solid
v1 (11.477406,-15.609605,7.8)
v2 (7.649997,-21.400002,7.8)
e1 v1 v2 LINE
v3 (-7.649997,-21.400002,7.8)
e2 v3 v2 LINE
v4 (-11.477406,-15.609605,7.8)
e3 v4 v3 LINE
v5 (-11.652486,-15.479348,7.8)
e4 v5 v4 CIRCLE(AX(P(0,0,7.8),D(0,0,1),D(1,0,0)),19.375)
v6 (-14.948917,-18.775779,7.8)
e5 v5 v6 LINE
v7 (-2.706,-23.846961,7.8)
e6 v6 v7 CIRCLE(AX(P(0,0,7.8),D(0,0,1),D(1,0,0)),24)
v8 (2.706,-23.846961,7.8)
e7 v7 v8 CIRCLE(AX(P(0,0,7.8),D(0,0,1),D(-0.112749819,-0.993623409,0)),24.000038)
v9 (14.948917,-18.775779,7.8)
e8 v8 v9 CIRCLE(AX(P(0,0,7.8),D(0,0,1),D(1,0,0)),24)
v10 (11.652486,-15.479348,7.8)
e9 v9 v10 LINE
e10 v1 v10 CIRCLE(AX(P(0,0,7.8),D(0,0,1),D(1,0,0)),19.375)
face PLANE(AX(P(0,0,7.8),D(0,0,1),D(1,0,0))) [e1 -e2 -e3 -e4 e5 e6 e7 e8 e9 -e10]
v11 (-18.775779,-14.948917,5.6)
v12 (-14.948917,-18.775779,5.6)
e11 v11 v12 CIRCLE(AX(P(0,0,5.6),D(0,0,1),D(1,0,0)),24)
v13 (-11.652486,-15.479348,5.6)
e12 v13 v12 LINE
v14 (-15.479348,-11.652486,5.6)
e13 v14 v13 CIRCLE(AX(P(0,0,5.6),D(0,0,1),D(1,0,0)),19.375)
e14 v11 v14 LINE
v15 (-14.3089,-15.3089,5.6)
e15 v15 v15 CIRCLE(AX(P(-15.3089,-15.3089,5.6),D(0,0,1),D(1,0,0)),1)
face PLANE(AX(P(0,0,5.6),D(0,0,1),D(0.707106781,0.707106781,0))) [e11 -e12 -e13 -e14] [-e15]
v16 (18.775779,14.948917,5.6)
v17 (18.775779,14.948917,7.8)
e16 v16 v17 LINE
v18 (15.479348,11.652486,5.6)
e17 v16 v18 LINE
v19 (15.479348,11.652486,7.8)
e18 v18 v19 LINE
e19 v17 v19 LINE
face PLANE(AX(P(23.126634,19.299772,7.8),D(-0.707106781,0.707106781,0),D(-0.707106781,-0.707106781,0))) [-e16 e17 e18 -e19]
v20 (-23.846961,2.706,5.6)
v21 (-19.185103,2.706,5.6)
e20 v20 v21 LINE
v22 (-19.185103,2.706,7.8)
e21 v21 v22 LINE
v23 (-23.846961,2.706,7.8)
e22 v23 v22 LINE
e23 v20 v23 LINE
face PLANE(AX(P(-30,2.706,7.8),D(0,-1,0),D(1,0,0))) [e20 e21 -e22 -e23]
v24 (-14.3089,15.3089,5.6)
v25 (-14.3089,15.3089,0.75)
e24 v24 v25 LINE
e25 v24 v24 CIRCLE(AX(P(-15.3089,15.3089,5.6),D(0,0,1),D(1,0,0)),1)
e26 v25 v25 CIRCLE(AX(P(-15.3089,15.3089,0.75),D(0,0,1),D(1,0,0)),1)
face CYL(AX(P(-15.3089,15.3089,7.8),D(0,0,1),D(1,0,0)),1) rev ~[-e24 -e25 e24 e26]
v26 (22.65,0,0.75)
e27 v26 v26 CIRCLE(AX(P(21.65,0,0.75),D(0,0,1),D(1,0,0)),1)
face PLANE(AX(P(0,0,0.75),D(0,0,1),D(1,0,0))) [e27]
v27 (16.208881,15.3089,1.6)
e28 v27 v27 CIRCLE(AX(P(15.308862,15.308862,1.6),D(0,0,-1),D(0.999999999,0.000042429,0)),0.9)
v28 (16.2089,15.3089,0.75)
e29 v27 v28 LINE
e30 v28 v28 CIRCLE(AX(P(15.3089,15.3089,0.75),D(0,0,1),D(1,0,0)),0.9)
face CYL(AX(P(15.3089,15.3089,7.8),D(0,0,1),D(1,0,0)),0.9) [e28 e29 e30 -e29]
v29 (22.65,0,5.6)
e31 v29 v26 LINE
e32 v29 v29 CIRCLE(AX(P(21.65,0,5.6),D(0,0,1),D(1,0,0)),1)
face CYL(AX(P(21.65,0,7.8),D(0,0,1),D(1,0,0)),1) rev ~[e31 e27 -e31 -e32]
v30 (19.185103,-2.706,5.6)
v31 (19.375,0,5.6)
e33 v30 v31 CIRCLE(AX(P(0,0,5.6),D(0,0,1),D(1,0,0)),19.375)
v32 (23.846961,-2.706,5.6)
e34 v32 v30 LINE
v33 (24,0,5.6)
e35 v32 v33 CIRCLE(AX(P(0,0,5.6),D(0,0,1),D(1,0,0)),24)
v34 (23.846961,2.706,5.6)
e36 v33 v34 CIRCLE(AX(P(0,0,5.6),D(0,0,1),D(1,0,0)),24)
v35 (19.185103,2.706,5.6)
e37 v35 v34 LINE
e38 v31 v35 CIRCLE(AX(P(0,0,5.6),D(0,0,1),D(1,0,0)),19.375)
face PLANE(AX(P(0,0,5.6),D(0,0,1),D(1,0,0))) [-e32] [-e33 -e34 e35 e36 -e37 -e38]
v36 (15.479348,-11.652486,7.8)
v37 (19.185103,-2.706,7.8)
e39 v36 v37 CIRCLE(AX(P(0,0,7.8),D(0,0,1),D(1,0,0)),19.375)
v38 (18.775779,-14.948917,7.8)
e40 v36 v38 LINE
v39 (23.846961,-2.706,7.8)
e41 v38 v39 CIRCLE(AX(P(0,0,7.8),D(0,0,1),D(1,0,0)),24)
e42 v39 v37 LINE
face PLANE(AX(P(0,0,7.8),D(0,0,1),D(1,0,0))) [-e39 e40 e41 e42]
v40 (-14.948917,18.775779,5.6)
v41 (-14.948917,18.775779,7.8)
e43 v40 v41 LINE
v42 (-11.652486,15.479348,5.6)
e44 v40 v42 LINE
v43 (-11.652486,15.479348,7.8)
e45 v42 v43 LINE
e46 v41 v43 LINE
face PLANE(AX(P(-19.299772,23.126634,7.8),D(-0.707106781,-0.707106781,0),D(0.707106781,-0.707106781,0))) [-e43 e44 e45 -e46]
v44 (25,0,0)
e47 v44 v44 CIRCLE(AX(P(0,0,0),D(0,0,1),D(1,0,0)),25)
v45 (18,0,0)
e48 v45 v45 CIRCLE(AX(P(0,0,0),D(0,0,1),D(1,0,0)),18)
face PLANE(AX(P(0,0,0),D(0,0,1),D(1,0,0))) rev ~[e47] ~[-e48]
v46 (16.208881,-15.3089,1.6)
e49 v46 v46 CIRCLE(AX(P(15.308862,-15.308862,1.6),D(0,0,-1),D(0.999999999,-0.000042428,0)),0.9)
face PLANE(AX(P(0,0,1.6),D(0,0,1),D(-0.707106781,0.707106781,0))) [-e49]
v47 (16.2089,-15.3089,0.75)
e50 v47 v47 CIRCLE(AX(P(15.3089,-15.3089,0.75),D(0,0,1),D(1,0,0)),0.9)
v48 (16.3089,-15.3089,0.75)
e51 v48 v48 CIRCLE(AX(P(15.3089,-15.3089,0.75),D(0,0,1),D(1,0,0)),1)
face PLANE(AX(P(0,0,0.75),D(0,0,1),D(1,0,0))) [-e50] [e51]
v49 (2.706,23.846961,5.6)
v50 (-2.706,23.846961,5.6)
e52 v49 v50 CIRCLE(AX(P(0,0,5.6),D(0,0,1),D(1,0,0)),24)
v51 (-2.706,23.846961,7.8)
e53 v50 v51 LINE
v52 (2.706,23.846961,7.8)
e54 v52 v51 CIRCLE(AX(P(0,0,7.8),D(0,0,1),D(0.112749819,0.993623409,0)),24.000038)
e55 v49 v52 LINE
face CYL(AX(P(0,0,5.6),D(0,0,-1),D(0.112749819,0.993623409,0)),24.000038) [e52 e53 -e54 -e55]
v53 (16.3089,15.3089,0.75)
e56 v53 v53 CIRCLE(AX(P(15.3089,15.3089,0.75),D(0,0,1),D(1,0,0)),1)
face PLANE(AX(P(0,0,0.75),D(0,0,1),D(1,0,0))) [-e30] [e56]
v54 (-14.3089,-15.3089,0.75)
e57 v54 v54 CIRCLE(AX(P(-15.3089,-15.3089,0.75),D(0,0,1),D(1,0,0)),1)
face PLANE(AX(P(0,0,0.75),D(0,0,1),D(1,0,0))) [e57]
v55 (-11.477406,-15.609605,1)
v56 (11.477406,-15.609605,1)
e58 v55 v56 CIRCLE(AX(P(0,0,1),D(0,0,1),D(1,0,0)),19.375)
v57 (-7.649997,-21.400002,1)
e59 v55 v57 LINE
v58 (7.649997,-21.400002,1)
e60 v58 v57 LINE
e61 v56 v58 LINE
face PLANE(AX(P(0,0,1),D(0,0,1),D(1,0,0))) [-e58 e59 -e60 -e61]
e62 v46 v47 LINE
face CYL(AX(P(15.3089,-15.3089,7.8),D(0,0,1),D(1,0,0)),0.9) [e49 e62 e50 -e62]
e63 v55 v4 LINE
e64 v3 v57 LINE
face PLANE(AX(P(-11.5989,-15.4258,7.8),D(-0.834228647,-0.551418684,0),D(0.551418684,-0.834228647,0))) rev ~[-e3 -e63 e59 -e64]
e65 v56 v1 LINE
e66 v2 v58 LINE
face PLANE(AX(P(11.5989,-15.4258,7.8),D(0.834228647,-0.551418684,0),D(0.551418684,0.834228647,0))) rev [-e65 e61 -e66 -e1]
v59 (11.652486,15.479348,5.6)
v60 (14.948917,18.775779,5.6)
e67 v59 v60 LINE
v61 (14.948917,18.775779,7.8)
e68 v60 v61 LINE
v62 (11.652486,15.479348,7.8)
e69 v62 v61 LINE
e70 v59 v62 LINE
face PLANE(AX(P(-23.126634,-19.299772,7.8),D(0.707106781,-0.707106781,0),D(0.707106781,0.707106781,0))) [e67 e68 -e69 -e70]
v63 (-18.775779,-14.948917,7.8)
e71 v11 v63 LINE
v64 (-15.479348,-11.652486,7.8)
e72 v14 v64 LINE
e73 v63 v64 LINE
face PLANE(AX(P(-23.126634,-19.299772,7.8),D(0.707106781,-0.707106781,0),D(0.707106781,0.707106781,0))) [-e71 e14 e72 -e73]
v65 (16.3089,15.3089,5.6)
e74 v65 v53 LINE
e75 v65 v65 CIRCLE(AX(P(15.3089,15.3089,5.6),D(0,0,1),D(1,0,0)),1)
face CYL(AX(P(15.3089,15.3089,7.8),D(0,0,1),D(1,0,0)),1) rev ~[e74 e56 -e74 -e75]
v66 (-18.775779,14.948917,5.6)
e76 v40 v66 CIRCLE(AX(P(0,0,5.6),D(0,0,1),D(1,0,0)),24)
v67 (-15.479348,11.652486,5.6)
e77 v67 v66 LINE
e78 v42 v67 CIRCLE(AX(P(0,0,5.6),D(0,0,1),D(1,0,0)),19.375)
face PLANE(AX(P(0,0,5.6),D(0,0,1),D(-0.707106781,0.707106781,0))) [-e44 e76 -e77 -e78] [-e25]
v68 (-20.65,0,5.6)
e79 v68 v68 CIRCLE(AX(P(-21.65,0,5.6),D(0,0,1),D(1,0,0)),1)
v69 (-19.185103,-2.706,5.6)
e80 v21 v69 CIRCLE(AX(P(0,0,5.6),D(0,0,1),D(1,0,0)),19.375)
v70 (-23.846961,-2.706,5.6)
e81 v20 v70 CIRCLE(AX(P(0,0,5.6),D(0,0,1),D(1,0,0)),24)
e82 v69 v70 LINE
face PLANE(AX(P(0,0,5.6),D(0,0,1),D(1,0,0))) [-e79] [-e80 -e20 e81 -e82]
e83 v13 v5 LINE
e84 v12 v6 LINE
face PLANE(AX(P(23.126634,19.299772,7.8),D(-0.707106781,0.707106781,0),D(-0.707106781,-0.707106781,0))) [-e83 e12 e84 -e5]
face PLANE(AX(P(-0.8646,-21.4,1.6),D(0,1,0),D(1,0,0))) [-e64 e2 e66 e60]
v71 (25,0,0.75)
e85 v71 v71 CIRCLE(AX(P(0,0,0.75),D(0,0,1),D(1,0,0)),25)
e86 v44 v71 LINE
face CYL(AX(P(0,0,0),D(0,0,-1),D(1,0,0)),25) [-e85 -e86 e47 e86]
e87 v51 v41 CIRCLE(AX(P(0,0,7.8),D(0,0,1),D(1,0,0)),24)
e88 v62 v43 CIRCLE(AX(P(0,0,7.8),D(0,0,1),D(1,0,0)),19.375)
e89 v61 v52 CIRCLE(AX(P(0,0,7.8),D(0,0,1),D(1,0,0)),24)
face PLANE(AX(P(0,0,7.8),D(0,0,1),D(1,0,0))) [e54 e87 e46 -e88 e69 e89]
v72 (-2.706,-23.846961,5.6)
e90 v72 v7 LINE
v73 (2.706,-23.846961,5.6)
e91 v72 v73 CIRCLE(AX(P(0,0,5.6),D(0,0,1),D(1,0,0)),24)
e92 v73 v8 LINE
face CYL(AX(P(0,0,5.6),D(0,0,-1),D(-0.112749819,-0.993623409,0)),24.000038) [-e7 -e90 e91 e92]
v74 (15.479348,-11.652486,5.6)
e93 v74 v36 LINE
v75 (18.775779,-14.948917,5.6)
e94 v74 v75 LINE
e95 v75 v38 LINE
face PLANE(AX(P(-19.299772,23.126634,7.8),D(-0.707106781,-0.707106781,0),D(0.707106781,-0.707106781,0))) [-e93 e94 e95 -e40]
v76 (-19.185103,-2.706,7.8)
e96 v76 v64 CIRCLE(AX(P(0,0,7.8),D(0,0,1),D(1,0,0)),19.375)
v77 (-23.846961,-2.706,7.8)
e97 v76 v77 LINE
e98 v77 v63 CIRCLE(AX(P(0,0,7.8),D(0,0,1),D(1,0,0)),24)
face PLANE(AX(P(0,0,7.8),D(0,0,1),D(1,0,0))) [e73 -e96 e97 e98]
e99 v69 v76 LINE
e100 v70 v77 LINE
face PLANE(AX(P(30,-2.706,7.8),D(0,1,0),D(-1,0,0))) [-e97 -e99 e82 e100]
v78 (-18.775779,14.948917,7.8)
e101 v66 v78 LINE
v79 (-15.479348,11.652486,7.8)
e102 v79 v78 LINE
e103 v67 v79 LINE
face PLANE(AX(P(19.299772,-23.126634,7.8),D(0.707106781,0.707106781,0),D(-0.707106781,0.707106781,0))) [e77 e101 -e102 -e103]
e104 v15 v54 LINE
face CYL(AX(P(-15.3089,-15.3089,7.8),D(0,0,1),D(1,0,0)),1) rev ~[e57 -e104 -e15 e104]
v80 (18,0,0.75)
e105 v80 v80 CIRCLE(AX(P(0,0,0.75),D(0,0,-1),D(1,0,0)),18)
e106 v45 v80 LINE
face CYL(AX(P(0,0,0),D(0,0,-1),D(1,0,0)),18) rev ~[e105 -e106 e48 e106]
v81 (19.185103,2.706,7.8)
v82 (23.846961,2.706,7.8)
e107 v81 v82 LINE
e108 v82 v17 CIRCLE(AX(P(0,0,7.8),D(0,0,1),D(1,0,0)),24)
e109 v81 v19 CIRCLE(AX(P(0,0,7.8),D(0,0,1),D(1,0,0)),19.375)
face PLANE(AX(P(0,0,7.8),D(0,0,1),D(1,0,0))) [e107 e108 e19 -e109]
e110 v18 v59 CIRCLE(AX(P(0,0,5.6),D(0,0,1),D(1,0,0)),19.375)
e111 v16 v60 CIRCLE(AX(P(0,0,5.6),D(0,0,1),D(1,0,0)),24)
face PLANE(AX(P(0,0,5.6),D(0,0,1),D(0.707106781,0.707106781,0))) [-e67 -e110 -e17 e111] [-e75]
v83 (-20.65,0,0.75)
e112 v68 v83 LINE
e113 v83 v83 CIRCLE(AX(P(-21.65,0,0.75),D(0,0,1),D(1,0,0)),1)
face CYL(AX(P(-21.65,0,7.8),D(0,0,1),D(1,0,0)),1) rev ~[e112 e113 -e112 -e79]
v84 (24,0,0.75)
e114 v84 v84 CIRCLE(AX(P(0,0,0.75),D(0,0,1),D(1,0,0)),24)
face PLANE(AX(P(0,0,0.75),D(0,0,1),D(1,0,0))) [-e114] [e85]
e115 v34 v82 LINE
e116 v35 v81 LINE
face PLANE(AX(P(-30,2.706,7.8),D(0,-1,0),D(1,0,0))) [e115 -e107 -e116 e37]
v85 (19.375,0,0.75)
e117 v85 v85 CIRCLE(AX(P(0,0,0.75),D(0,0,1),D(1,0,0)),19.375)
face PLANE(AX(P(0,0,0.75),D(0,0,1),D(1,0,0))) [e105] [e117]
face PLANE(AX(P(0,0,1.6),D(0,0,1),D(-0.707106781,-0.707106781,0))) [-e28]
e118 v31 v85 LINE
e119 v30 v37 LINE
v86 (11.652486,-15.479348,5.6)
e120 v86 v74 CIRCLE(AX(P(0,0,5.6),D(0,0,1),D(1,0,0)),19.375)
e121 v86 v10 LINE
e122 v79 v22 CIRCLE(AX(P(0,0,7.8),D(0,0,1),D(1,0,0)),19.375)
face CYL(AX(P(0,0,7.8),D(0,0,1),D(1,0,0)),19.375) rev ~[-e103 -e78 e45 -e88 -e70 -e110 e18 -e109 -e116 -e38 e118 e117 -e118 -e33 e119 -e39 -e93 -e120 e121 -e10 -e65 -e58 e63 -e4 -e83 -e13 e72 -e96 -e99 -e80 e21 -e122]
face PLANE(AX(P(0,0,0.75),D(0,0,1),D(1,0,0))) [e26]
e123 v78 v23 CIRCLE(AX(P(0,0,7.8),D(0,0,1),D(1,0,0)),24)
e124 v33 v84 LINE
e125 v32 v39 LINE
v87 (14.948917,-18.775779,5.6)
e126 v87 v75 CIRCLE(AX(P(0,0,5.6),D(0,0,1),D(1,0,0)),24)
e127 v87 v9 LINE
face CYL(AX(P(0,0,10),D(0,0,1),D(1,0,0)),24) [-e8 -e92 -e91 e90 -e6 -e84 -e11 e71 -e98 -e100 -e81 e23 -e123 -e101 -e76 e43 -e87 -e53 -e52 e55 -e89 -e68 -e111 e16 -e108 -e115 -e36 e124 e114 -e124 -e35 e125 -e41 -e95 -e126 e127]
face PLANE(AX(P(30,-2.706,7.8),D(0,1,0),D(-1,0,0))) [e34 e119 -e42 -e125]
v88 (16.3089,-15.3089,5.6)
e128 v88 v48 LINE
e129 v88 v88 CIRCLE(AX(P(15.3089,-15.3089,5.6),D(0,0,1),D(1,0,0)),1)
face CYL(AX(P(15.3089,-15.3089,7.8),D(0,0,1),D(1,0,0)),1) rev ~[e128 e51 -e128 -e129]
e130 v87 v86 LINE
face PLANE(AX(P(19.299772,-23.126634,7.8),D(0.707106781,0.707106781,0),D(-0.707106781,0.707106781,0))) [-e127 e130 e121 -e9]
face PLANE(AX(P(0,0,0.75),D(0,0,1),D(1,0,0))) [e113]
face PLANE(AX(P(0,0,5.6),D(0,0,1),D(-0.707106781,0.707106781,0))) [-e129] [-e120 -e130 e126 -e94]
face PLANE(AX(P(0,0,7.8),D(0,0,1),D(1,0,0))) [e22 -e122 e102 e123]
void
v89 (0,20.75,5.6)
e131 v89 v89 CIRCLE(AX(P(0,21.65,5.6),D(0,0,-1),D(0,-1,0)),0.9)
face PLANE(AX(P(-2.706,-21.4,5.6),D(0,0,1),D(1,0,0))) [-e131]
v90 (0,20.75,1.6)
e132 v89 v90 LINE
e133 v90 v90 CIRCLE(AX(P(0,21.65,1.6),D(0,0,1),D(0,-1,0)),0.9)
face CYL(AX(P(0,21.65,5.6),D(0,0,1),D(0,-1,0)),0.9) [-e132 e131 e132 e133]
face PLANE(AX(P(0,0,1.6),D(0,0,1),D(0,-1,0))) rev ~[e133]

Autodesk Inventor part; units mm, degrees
ref_plane "YZ Plane" through (0, 0, 0) normal (1, 0, 0) x (0, 1, 0)
ref_plane "XZ Plane" through (0, 0, 0) normal (0, 1, 0) x (-1, 0, 0)
ref_plane "XY Plane" through (0, 0, 0) normal (0, 0, 1) x (1, 0, 0)
sketch "Skizze1" plane through (0, 0, 0) normal (0, 0, 1) x (1, 0, 0)
  circle A0 centre (0, 0) radius 18
  circle A1 centre (0, 0) radius 25
  dimension "d0" = 36
  dimension "d1" = 50
extrude "Extrusion1" add sketch "Skizze1" along normal blind 35
sketch "Skizze2" plane through (0, 0, 35) normal (0, 0, 1) x (1, 0, 0)
  circle A0 centre (0, 0) radius 19.3
  line L0 (0, -19.3) -> (0, -21.4)
  line L1 (0, -21.4) -> (-7.65, -21.4)
  line L2 (-7.65, -21.4) -> (7.65, -21.4)
  line L3 (7.65, -21.4) -> (7.65, -17.7191)
  line L4 (-7.65, -21.4) -> (-7.65, -17.7191)
  circle A1 centre (0, 0) radius 25 projected
  circle A2 centre (0, 0) radius 18 projected
  circle A3 centre (0, 0) radius 25 projected
  circle A4 centre (0, 0) radius 18 projected
  circle A5 centre (0, 0) radius 19.3
  dimension "d4" = 38.6
  dimension "d5" = 2.1
  dimension "d6" = 7.65
  dimension "d7" = 90
  dimension "d8" = 15.3
extrude "Extrusion2" cut sketch "Skizze2" against normal blind 34 contours A0 | A0 L0 L1 L4 | L3 L2 L0 A0 | A2
fillet "Rundung1" radius 4 2 edges at (-7.65, -17.7191, 18) (7.65, -17.7191, 18)
sketch "Skizze3" plane through (0, 0, 35) normal (0, 0, 1) x (1, 0, 0)
  arc A0 (9.65, -16.7143) -> (7.65, -20.1784) centre (11.65, -20.1784) ccw projected
  line L0 (7.65, -20.1784) -> (7.65, -21.4) projected
  line L1 (7.65, -21.4) -> (-7.65, -21.4) projected
  line L2 (-7.65, -21.4) -> (-7.65, -20.1784) projected
  arc A1 (-7.65, -20.1784) -> (-9.65, -16.7143) centre (-11.65, -20.1784) ccw projected
  arc A2 (9.65, -16.7143) -> (-9.65, -16.7143) centre (0, 0) ccw projected
  circle A3 centre (0, 0) radius 25 projected
extrude "Extrusion3" cut sketch "Skizze3" against normal blind 25
sketch "Skizze4" plane through (0, 0, 10) normal (0, 0, 1) x (1, 0, 0)
  circle A0 centre (0, 0) radius 24
  circle A1 centre (0, 0) radius 25 projected
  arc A2 (9.65, -16.7143) -> (7.65, -20.1784) centre (11.65, -20.1784) ccw projected
  line L0 (7.65, -21.4) -> (7.65, -20.1784) projected
  line L1 (-7.65, -21.4) -> (7.65, -21.4) projected
  line L2 (-7.65, -20.1784) -> (-7.65, -21.4) projected
  arc A3 (-7.65, -20.1784) -> (-9.65, -16.7143) centre (-11.65, -20.1784) ccw projected
  arc A4 (9.65, -16.7143) -> (-9.65, -16.7143) centre (0, 0) ccw projected
  dimension "d14" = 48
extrude "Extrusion4" cut sketch "Skizze4" against normal blind 9.25 contours A1
sketch "Skizze5" plane through (0, 0, 10) normal (0, 0, 1) x (1, 0, 0)
  circle A0 centre (0, 0) radius 24 projected
  arc A1 (9.65, -16.7143) -> (7.65, -20.1784) centre (11.65, -20.1784) ccw projected
  line L0 (7.65, -21.4) -> (7.65, -20.1784) projected
  line L1 (-7.65, -21.4) -> (7.65, -21.4) projected
  line L2 (-7.65, -20.1784) -> (-7.65, -21.4) projected
  arc A2 (-7.65, -20.1784) -> (-9.65, -16.7143) centre (-11.65, -20.1784) ccw projected
  arc A3 (9.65, -16.7143) -> (-9.65, -16.7143) centre (0, 0) ccw projected
extrude "Extrusion5" cut sketch "Skizze5" against normal blind 2.2
sketch "Skizze6" plane through (0, 0, 7.8) normal (0, 0, 1) x (1, 0, 0)
  line L0 (30, -2.706) -> (-30, -2.706)
  line L1 (-30, -2.706) -> (-30, 2.706)
  line L2 (-30, 2.706) -> (30, 2.706)
  line L3 (30, 2.706) -> (30, -2.706)
  line L4 (30, -2.706) -> (-30, 2.706) construction
  line L5 (-30, -2.706) -> (30, 2.706) construction
  point P0 (0, 0)
  dimension "d33" = 60
extrude "Extrusion6" cut sketch "Skizze6" against normal blind 2.2
sketch "Skizze7" plane through (0, 0, 5.6) normal (0, 0, 1) x (1, 0, 0)
  line L0 (-22.5614, -2.035) -> (-22.5614, 2.035) projected
  line L1 (-22.5614, 0) -> (-19.3, 0)
  arc A0 (-19.1094, 2.706) -> (-19.1094, -2.706) centre (0, 0) ccw projected
  line L2 (-19.3, 0) -> (-24, 0)
  circle A1 centre (0, 0) radius 24 projected
  circle A2 centre (-21.65, 0) radius 0.9
  dimension "d34" = 1.8
extrude "Extrusion7" cut sketch "Skizze7" against normal blind 4 contours A2 L1 | L1 A2
mirror "Spiegeln1" about plane through (0, 0, 0) normal (1, 0, 0) of "Extrusion7"
sketch "Skizze8" plane through (0, 0, 7.8) normal (0, 0, 1) x (1, 0, 0)
  point P0 (0, 0)
pattern_circular "Runde Anordnung1" count 8 over 360 about axis through (0, 0, -10) along (0, 0, 1) of "Extrusion7", "Extrusion6"
sketch "Skizze9" plane through (0, -20.9307, 1.6) normal (0, 0, 1) x (1, 0, 0)
  line L0 (-0.8646, -0.4693) -> (0.8646, -0.4693) projected
  line L1 (-2.706, -0.4693) -> (-0.8646, -0.4693) projected
  line L2 (-2.706, 40.0401) -> (-2.706, 44.7777) projected
  line L3 (2.706, 44.7777) -> (2.706, 40.0401) projected
  arc A0 (2.706, 44.7777) -> (-2.706, 44.7777) centre (0, 20.9307) ccw projected
  arc A1 (2.706, 40.0401) -> (-2.706, 40.0401) centre (0, 20.9307) ccw projected
  arc A2 (-2.706, -2.9163) -> (2.706, -2.9163) centre (0, 20.9307) ccw projected
  line L4 (2.706, -0.4693) -> (2.706, -2.9163) projected
  line L5 (-2.706, -2.9163) -> (-2.706, -0.4693) projected
  line L6 (0.8646, -0.4693) -> (2.706, -0.4693) projected
  arc A3 (-0.8646, -0.4693) -> (0.8646, -0.4693) centre (0, -0.7193) ccw projected
  arc A4 (-0.8646, -0.4693) -> (0.8646, -0.4693) centre (0, -0.7193) ccw projected
extrude "Extrusion8" add sketch "Skizze9" along normal blind 4 contours L0 A3
sketch "Skizze10" plane through (-2.706, -21.4, 5.6) normal (0, 0, 1) x (1, 0, 0)
  line L0 (0, 0) -> (5.412, 0) projected
  line L1 (0, 40.5094) -> (0, 45.247) projected
  line L2 (5.412, 45.247) -> (5.412, 40.5094) projected
  arc A0 (5.412, 45.247) -> (0, 45.247) centre (2.706, 21.4) ccw projected
  arc A1 (5.412, 40.5094) -> (0, 40.5094) centre (2.706, 21.4) ccw projected
  arc A2 (0, -2.447) -> (5.412, -2.447) centre (2.706, 21.4) ccw projected
  line L3 (5.412, 0) -> (5.412, -2.447) projected
  line L4 (0, -2.447) -> (0, 0) projected
extrude "Extrusion9" add sketch "Skizze10" along normal up to surface (2.2 mm away)
sketch "Skizze11" plane through (0, 0, 7.8) normal (0, 0, 1) x (-0.3826834, -0.9238795, 0)
  line L0 (15.7149, 14.7896) -> (16.8435, 15.2571) projected
  arc A0 (11.7491, 15.3117) -> (9.8128, 16.6192) centre (0, 0) ccw projected
  line L1 (16.8435, 15.2571) -> (11.7491, 15.3117)
  line L2 (-18.6903, 4.8128) -> (-23.0673, 6.6258) projected
  arc A1 (9.8128, -16.6192) -> (16.6192, -9.8128) centre (0, 0) ccw projected
  line L3 (9.8128, -16.6192) -> (11.6258, -20.9962) projected
  line L4 (6.6258, -23.0673) -> (4.8128, -18.6903) projected
  arc A2 (-4.8128, -18.6903) -> (4.8128, -18.6903) centre (0, 0) ccw projected
  line L5 (-4.8128, -18.6903) -> (-6.6258, -23.0673) projected
  line L6 (4.8128, 18.6903) -> (6.6258, 23.0673) projected
  line L7 (20.9962, -11.6258) -> (16.6192, -9.8128) projected
  line L8 (18.6903, -4.8128) -> (23.0673, -6.6258) projected
  arc A3 (-9.8128, 16.6192) -> (-16.6192, 9.8128) centre (0, 0) ccw projected
  line L9 (-9.8128, 16.6192) -> (-11.6258, 20.9962) projected
  line L10 (-6.6258, 23.0673) -> (-4.8128, 18.6903) projected
  arc A4 (4.8128, 18.6903) -> (-4.8128, 18.6903) centre (0, 0) ccw projected
  line L11 (-11.6258, -20.9962) -> (-9.8128, -16.6192) projected
  line L12 (11.6258, 20.9962) -> (9.8128, 16.6192) projected
  arc A5 (11.7491, 15.3117) -> (9.8128, 16.6192) centre (0, 0) ccw projected
  arc A6 (11.7491, 15.3117) -> (15.7149, 14.7896) centre (14.1841, 18.4851) ccw projected
  line L13 (16.8435, 15.2571) -> (15.7149, 14.7896) projected
  line L14 (22.6986, 1.1217) -> (16.8435, 15.2571) projected
  line L15 (21.5699, 0.6543) -> (22.6986, 1.1217) projected
  arc A7 (21.5699, 0.6543) -> (19.1349, -2.5192) centre (23.1007, -3.0413) ccw projected
  arc A8 (18.6903, -4.8128) -> (19.1349, -2.5192) centre (0, 0) ccw projected
  line L16 (-20.9962, 11.6258) -> (-16.6192, 9.8128) projected
  arc A9 (-6.6258, -23.0673) -> (6.6258, -23.0673) centre (0, 0) ccw projected
  arc A10 (-18.6903, 4.8128) -> (-9.8128, -16.6192) centre (0, 0) ccw projected
  arc A11 (-23.0673, 6.6258) -> (-11.6258, -20.9962) centre (0, 0) ccw projected
  arc A12 (-11.6258, 20.9962) -> (-20.9962, 11.6258) centre (0, 0) ccw projected
  arc A13 (11.6258, -20.9962) -> (20.9962, -11.6258) centre (0, 0) ccw projected
  arc A14 (6.6258, 23.0673) -> (-6.6258, 23.0673) centre (0, 0) ccw projected
  arc A15 (23.0673, -6.6258) -> (11.6258, 20.9962) centre (0, 0) ccw projected
  point P0 (15.7149, 14.7896)
extrude "Extrusion10" cut sketch "Skizze11" against normal up to surface (6.8 mm away) contours A6 L1 L0
mirror "Spiegeln2" about plane through (0, 0, 0) normal (1, 0, 0) of "Extrusion10"
sketch "Skizze12" plane through (0, 0, 7.8) normal (0, 0, 1) x (-0.3826834, -0.9238795, 0)
  point P0 (0, 0)
sketch "Skizze13" plane through (0, 0, 7.8) normal (0, 0, 1) x (1, 0, 0)
  line L0 (-7.65, -21.4) -> (-9.65, -16.7143) projected
  arc A0 (-11.5989, -15.4258) -> (-9.65, -16.7143) centre (0, 0) ccw projected
  line L1 (-11.5989, -15.4258) -> (-14.9489, -18.7758) projected
  arc A1 (-14.9489, -18.7758) -> (14.9489, -18.7758) centre (0, 0) ccw projected
  line L2 (14.9489, -18.7758) -> (11.5989, -15.4258) projected
  arc A2 (9.65, -16.7143) -> (11.5989, -15.4258) centre (0, 0) ccw projected
  line L3 (9.65, -16.7143) -> (7.65, -21.4) projected
  line L4 (-7.65, -21.4) -> (7.65, -21.4) projected
  arc A3 (-11.5989, -15.4258) -> (-9.65, -16.7143) centre (0, 0) ccw projected
  line L5 (7.65, -21.4) -> (-7.65, -21.4) projected
  line L6 (-11.5989, -15.4258) -> (-7.65, -21.4)
extrude "Extrusion11" cut sketch "Skizze13" against normal up to surface (6.8 mm away) contours L6 A0 L0
mirror "Spiegeln3" about plane through (0, 0, 0) normal (1, 0, 0) of "Extrusion11"
sketch "Skizze14" plane through (0, 0, 1) normal (0, 0, 1) x (1, 0, 0)
  point P0 (0, 0)
sketch "Skizze15" plane through (0, 0, 7.8) normal (0, 0, 1) x (1, 0, 0)
  circle A0 centre (0, 0) radius 19.375
  dimension "d37" = 38.75
extrude "Extrusion12" cut sketch "Skizze15" against normal up to surface (7.05 mm away)
sketch "Skizze16" plane through (0, 0, 7.8) normal (0, 0, 1) x (1, 0, 0)
  circle A0 centre (-15.3089, 15.3089) radius 0.9 projected
  circle A1 centre (-15.3089, 15.3089) radius 1
  circle A2 centre (-21.65, 0) radius 0.9 projected
  circle A3 centre (-21.65, 0) radius 1
  circle A4 centre (-15.3089, -15.3089) radius 0.9 projected
  circle A5 centre (-15.3089, -15.3089) radius 1
  circle A6 centre (15.3089, -15.3089) radius 0.9 projected
  circle A7 centre (15.3089, -15.3089) radius 1
  circle A8 centre (21.65, 0) radius 0.9 projected
  circle A9 centre (21.65, 0) radius 1
  circle A10 centre (15.3089, 15.3089) radius 0.9 projected
  circle A11 centre (15.3089, 15.3089) radius 1
  point P0 (0, 0)
  dimension "d40" = 2
  dimension "d41" = 2
  dimension "d42" = 2
  dimension "d43" = 2
  dimension "d44" = 2
  dimension "d45" = 2
extrude "Extrusion13" cut sketch "Skizze16" against normal up to surface (7.05 mm away) contours A0 | A1 | A2 | A3 | A4 | A5 | A7 | A8 | A9 | A11
properties part number "LCDmount_3D-Druck"
